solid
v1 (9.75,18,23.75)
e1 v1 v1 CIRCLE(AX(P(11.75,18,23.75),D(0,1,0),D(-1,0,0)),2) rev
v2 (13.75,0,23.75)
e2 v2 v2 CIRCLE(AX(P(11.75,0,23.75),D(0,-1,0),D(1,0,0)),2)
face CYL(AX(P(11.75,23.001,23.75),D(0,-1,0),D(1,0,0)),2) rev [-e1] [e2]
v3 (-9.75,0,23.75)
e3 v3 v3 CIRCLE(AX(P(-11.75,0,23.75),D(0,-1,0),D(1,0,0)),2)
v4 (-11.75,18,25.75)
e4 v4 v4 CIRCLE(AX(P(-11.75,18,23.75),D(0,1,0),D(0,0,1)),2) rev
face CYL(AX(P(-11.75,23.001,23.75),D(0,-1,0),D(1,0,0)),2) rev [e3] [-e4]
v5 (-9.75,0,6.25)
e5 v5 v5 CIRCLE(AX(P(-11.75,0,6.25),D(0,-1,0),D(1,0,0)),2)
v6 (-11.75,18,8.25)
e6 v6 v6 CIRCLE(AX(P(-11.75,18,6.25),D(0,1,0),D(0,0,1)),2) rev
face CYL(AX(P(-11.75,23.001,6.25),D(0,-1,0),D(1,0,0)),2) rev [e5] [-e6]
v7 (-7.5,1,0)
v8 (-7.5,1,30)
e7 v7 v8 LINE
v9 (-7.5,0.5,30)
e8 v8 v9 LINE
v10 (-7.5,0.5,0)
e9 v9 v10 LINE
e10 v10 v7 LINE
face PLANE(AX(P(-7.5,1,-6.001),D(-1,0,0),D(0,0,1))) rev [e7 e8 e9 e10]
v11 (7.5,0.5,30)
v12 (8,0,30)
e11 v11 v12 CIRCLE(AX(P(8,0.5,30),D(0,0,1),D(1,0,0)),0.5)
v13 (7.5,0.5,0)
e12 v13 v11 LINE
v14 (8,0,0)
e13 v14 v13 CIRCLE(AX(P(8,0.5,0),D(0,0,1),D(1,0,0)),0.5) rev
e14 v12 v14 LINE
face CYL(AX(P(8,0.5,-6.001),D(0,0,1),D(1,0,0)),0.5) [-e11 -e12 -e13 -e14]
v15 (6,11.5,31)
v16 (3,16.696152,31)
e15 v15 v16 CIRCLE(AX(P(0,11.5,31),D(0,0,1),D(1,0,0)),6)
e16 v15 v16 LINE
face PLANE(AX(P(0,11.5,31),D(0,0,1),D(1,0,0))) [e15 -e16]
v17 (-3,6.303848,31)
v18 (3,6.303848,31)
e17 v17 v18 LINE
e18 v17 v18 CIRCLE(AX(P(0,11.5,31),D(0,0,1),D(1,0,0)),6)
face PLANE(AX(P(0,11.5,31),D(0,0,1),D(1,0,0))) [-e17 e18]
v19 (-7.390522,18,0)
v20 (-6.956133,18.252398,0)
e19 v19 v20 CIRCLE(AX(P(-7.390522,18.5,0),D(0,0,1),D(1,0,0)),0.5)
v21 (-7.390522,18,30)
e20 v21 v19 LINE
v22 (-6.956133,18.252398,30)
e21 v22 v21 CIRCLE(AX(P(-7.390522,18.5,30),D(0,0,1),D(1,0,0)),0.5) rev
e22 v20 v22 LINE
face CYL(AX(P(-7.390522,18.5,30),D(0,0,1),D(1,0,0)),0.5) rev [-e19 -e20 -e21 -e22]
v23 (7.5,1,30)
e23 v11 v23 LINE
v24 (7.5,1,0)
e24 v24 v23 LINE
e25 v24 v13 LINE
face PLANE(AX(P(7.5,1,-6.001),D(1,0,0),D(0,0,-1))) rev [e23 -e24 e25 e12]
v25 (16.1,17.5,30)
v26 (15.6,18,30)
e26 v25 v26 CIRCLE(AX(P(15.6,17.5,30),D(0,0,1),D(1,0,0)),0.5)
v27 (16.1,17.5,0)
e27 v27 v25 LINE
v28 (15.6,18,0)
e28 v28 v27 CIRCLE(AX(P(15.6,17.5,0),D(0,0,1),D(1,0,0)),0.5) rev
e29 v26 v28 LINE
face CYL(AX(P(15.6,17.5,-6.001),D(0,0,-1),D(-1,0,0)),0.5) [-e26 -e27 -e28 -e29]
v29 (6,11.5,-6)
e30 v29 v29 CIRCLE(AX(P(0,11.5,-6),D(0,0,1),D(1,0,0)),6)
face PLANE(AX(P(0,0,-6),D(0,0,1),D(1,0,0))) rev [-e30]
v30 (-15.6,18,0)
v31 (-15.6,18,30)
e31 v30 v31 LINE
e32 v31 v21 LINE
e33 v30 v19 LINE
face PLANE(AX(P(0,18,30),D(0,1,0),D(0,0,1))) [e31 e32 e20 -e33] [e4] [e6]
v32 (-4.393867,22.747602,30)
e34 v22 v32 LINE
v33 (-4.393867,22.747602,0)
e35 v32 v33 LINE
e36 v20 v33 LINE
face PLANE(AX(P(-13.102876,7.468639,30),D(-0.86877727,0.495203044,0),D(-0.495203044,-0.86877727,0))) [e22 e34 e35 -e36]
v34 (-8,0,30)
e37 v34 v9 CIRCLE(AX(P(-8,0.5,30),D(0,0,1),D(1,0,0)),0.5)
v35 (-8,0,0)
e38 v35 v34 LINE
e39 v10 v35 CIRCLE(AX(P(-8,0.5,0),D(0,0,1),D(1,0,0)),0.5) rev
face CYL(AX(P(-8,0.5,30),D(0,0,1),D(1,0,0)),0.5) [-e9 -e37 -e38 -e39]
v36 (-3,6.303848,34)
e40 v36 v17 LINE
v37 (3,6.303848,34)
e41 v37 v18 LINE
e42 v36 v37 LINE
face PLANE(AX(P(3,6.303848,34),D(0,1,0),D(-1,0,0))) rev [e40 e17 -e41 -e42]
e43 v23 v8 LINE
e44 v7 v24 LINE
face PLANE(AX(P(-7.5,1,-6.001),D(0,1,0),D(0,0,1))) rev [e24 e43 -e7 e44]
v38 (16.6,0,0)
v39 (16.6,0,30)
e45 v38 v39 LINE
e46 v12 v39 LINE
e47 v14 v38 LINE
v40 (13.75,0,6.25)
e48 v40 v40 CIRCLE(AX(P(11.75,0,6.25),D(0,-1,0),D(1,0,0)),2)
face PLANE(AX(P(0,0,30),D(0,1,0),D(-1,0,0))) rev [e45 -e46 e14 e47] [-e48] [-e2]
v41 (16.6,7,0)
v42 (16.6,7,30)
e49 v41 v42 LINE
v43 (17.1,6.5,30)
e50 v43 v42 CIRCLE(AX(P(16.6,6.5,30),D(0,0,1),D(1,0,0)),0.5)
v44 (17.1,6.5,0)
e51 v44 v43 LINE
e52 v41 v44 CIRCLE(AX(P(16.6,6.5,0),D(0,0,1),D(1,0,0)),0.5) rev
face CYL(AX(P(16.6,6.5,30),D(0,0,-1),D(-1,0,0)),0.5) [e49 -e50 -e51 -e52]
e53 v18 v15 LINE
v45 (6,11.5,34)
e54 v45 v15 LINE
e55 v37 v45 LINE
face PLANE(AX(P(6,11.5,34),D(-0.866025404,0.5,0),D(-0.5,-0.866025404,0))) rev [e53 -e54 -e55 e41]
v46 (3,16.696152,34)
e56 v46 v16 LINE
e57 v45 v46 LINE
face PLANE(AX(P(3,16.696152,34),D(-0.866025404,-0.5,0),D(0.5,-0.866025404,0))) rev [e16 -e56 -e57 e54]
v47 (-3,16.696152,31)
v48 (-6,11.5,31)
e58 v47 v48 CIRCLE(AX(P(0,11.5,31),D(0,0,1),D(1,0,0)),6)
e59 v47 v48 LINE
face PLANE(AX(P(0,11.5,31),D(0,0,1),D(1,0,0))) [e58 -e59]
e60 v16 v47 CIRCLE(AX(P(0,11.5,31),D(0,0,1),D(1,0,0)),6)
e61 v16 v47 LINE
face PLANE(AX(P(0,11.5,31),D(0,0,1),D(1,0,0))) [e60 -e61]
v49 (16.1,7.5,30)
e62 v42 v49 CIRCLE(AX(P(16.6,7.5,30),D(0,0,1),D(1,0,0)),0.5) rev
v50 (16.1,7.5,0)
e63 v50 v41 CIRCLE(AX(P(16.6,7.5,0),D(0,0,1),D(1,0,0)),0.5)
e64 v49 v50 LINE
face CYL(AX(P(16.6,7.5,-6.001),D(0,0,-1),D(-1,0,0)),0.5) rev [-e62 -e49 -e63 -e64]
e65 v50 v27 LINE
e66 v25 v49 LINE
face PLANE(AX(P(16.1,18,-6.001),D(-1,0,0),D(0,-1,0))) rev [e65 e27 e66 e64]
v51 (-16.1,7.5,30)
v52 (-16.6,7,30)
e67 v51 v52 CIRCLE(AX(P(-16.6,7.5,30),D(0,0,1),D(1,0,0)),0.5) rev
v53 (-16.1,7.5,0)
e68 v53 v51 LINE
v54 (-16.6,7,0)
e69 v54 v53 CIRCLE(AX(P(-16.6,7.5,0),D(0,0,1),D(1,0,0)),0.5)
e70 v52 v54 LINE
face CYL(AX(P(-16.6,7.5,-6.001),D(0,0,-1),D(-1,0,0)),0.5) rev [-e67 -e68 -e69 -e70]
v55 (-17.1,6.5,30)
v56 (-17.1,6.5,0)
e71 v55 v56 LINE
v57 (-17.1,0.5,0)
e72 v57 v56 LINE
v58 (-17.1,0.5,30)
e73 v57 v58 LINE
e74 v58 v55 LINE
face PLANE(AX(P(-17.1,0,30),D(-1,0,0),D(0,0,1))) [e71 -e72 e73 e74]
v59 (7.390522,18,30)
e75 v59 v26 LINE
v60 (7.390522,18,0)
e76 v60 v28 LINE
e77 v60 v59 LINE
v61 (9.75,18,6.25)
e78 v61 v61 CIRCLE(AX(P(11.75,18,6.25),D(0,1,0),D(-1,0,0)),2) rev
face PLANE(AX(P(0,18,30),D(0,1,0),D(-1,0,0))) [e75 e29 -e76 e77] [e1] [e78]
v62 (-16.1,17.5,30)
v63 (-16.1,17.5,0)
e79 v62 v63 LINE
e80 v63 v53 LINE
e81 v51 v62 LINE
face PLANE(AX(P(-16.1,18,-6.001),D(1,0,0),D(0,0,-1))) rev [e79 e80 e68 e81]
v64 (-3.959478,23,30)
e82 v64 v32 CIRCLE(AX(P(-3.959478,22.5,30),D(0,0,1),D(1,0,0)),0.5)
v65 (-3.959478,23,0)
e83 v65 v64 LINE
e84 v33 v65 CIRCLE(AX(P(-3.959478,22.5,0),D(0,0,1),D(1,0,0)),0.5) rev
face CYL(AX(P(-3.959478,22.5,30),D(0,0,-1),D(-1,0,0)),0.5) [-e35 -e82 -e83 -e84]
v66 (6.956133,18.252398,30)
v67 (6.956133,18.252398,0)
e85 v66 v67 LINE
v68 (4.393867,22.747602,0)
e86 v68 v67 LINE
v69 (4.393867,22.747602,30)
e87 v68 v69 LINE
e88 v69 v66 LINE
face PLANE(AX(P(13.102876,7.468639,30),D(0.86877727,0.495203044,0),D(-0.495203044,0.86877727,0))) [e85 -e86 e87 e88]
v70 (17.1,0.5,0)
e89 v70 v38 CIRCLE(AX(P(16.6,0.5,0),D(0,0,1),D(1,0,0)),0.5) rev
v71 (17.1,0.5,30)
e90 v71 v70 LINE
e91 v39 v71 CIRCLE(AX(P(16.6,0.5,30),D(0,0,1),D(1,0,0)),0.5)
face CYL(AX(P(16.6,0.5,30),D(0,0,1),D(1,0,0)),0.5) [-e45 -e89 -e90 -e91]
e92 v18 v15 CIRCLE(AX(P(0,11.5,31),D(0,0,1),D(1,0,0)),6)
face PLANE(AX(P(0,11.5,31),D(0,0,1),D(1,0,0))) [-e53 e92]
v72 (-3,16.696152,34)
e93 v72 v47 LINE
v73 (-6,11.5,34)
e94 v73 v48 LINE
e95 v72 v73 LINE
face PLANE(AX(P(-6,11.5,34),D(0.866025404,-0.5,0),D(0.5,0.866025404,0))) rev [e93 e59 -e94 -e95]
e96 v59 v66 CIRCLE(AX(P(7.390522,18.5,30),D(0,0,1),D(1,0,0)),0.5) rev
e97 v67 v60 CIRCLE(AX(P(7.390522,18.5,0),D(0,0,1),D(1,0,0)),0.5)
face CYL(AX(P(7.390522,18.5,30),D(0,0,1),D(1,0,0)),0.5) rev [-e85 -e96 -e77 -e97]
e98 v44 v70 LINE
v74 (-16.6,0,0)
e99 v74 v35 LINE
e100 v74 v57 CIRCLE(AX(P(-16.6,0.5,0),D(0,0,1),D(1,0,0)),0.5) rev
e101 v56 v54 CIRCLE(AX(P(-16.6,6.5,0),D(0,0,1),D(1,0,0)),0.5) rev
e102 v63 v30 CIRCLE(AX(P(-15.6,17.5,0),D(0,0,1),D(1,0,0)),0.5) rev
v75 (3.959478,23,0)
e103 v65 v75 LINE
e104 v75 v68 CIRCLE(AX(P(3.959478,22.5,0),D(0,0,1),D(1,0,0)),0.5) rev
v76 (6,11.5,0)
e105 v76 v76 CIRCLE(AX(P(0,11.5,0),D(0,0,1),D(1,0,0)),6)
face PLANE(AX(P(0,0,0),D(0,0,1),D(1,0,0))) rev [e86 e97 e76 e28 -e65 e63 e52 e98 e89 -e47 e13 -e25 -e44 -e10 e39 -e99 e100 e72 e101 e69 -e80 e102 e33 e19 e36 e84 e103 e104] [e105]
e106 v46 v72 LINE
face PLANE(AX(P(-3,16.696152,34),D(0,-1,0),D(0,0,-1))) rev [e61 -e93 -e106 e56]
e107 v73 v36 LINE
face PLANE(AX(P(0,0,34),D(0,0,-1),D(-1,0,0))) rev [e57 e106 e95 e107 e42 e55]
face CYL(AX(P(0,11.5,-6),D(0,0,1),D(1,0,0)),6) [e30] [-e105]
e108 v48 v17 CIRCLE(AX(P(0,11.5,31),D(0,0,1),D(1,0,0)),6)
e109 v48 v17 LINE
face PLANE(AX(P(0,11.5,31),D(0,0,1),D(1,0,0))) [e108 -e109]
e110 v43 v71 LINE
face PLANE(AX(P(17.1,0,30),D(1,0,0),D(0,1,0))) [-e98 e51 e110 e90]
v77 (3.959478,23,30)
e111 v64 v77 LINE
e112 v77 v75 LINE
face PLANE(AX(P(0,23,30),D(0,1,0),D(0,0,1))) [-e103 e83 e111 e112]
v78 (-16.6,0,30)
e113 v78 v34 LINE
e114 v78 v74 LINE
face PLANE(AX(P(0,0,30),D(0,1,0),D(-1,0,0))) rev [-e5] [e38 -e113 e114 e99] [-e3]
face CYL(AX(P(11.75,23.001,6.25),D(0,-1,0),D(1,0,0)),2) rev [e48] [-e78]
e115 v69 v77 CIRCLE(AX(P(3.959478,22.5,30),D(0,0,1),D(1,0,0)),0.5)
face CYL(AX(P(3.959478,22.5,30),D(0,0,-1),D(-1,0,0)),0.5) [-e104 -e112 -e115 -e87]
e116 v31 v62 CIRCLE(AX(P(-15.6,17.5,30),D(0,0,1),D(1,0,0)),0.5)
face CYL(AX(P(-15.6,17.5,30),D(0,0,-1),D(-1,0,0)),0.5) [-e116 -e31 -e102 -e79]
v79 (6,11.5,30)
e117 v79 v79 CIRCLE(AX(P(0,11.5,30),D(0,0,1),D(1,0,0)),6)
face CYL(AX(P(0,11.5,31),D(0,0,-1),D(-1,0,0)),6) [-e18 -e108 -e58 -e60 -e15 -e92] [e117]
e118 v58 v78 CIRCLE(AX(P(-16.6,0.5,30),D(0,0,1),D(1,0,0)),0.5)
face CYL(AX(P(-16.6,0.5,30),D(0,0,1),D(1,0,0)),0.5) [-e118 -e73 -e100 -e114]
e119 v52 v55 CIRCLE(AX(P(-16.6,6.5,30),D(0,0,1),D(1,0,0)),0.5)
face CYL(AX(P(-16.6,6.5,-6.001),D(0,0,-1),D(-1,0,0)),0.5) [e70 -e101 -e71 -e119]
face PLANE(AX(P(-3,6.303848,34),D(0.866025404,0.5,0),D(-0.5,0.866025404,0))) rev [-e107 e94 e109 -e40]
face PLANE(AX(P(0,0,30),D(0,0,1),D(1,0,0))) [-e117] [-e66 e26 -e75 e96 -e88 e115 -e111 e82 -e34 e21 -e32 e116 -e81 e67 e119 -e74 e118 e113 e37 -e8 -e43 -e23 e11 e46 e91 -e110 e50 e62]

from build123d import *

# Parameters (mm, degrees)
SKETCH_2_R          = 6
EXTRUDE_1_DEPTH     = 30
SKETCH_2_3_R        = 6
EXTRUDE_2_DEPTH     = 6
EXTRUDE_START       = 31
SKETCH_2_4_R        = 6
EXTRUDE_3_DEPTH     = 1
CUT_EXTRUDE_1_REACH = 44.219
SKETCH_4_R          = 2
CUT_EXTRUDE_2_REACH = 48.015
SKETCH_5_W          = 1
SKETCH_5_H          = 11
SKETCH_5_W_2        = 15
SKETCH_5_H_2        = 1
FILLET_1_R          = 0.5
EXTRUDE_4_DEPTH     = 3


with BuildPart() as part:
    # 草图2 → 凸台-拉伸1 (new body)
    # profile 1 of 2: a face of its own
    with BuildSketch(Plane.XY):
        Polygon((17.1, 18), (17.1, 0), (-17.1, 0), (-17.1, 18), (-7.1, 18), (-4.25, 23), (4.25, 23), (7.1, 18), align=None)
        with Locations((0, 11.5)):
            Circle(SKETCH_2_R, mode=Mode.SUBTRACT)
    # profile 2 of 2: a face of its own
    with BuildSketch(Plane.XY):
        with Locations((0, 11.5)):
            Circle(SKETCH_2_R)
    extrude(amount=EXTRUDE_1_DEPTH)

    # 草图2<3> → 凸台-拉伸2 (add)
    with BuildSketch(Plane.XY):
        with Locations((0, 11.5)):
            Circle(SKETCH_2_3_R)
    extrude(amount=-EXTRUDE_2_DEPTH)

    # 草图2<4> → 凸台-拉伸3 (add)
    with BuildSketch(Plane.XY.offset(EXTRUDE_START)):
        with Locations((0, 11.5)):
            Circle(SKETCH_2_4_R)
    extrude(amount=-EXTRUDE_3_DEPTH)

    # 草图4 → 切除-拉伸1 (cut, up to next)
    with BuildSketch(Plane.XZ, mode=Mode.PRIVATE) as cut_extrude_1_sk1:
        with Locations((11.75, 23.75)):
            Circle(SKETCH_4_R)
    cut_extrude_1_tool1 = extrude(cut_extrude_1_sk1.sketch, amount=-CUT_EXTRUDE_1_REACH, mode=Mode.PRIVATE) & part.part
    # 草图4 → 切除-拉伸1 (cut, up to next)
    with BuildSketch(Plane.XZ, mode=Mode.PRIVATE) as cut_extrude_1_sk2:
        with Locations((11.75, 6.25)):
            Circle(SKETCH_4_R)
    cut_extrude_1_tool2 = extrude(cut_extrude_1_sk2.sketch, amount=-CUT_EXTRUDE_1_REACH, mode=Mode.PRIVATE) & part.part
    # 草图4 → 切除-拉伸1 (cut, up to next)
    with BuildSketch(Plane.XZ, mode=Mode.PRIVATE) as cut_extrude_1_sk3:
        with Locations((-11.75, 23.75)):
            Circle(SKETCH_4_R)
    cut_extrude_1_tool3 = extrude(cut_extrude_1_sk3.sketch, amount=-CUT_EXTRUDE_1_REACH, mode=Mode.PRIVATE) & part.part
    # 草图4 → 切除-拉伸1 (cut, up to next)
    with BuildSketch(Plane.XZ, mode=Mode.PRIVATE) as cut_extrude_1_sk4:
        with Locations((-11.75, 6.25)):
            Circle(SKETCH_4_R)
    cut_extrude_1_tool4 = extrude(cut_extrude_1_sk4.sketch, amount=-CUT_EXTRUDE_1_REACH, mode=Mode.PRIVATE) & part.part
    add(cut_extrude_1_tool1.solids().sort_by_distance((11.75, 0, 23.75))[0], mode=Mode.SUBTRACT)
    add(cut_extrude_1_tool2.solids().sort_by_distance((11.75, 0, 6.25))[0], mode=Mode.SUBTRACT)
    add(cut_extrude_1_tool3.solids().sort_by_distance((-11.75, 0, 23.75))[0], mode=Mode.SUBTRACT)
    add(cut_extrude_1_tool4.solids().sort_by_distance((-11.75, 0, 6.25))[0], mode=Mode.SUBTRACT)

    # 草图5 → 切除-拉伸2 (cut, up to next)
    with BuildSketch(Plane.XY.offset(30), mode=Mode.PRIVATE) as cut_extrude_2_sk1:
        with Locations((16.6, 12.5)):
            Rectangle(SKETCH_5_W, SKETCH_5_H)
    cut_extrude_2_tool1 = extrude(cut_extrude_2_sk1.sketch, amount=-CUT_EXTRUDE_2_REACH, mode=Mode.PRIVATE) & part.part
    # 草图5 → 切除-拉伸2 (cut, up to next)
    with BuildSketch(Plane.XY.offset(30), mode=Mode.PRIVATE) as cut_extrude_2_sk2:
        with Locations((-16.6, 12.5)):
            Rectangle(SKETCH_5_W, SKETCH_5_H)
    cut_extrude_2_tool2 = extrude(cut_extrude_2_sk2.sketch, amount=-CUT_EXTRUDE_2_REACH, mode=Mode.PRIVATE) & part.part
    # 草图5 → 切除-拉伸2 (cut, up to next)
    with BuildSketch(Plane.XY.offset(30), mode=Mode.PRIVATE) as cut_extrude_2_sk3:
        with Locations((0, 0.5)):
            Rectangle(SKETCH_5_W_2, SKETCH_5_H_2)
    cut_extrude_2_tool3 = extrude(cut_extrude_2_sk3.sketch, amount=-CUT_EXTRUDE_2_REACH, mode=Mode.PRIVATE) & part.part
    add(cut_extrude_2_tool1.solids().sort_by_distance((16.6, 12.5, 30))[0], mode=Mode.SUBTRACT)
    add(cut_extrude_2_tool2.solids().sort_by_distance((-16.6, 12.5, 30))[0], mode=Mode.SUBTRACT)
    add(cut_extrude_2_tool3.solids().sort_by_distance((0, 0.5, 30))[0], mode=Mode.SUBTRACT)

    # 圆角1
    fillet_1_edges = [part.edges().sort_by_distance(p)[0] for p in [
        (17.1, 0, 15),
        (7.5, 0, 15),
        (-7.5, 0, 15),
        (-17.1, 0, 15),
        (-17.1, 7, 15),
        (-16.1, 7, 15),
        (-16.1, 18, 15),
        (17.1, 7, 15),
        (16.1, 7, 15),
        (16.1, 18, 15),
        (-7.1, 18, 15),
        (7.1, 18, 15),
        (-4.25, 23, 15),
        (4.25, 23, 15),
    ]]
    fillet(fillet_1_edges, radius=FILLET_1_R - 0.0001)  # a hair under: the kernel refuses the full size

    # 草图6 → 凸台-拉伸4 (add)
    with BuildSketch(Plane.XY.offset(31)):
        Polygon((-3, 16.696152423), (3, 16.696152423), (6, 11.5), (3, 6.303847577), (-3, 6.303847577), (-6, 11.5), align=None)
    extrude(amount=EXTRUDE_4_DEPTH)


solid = part.part
